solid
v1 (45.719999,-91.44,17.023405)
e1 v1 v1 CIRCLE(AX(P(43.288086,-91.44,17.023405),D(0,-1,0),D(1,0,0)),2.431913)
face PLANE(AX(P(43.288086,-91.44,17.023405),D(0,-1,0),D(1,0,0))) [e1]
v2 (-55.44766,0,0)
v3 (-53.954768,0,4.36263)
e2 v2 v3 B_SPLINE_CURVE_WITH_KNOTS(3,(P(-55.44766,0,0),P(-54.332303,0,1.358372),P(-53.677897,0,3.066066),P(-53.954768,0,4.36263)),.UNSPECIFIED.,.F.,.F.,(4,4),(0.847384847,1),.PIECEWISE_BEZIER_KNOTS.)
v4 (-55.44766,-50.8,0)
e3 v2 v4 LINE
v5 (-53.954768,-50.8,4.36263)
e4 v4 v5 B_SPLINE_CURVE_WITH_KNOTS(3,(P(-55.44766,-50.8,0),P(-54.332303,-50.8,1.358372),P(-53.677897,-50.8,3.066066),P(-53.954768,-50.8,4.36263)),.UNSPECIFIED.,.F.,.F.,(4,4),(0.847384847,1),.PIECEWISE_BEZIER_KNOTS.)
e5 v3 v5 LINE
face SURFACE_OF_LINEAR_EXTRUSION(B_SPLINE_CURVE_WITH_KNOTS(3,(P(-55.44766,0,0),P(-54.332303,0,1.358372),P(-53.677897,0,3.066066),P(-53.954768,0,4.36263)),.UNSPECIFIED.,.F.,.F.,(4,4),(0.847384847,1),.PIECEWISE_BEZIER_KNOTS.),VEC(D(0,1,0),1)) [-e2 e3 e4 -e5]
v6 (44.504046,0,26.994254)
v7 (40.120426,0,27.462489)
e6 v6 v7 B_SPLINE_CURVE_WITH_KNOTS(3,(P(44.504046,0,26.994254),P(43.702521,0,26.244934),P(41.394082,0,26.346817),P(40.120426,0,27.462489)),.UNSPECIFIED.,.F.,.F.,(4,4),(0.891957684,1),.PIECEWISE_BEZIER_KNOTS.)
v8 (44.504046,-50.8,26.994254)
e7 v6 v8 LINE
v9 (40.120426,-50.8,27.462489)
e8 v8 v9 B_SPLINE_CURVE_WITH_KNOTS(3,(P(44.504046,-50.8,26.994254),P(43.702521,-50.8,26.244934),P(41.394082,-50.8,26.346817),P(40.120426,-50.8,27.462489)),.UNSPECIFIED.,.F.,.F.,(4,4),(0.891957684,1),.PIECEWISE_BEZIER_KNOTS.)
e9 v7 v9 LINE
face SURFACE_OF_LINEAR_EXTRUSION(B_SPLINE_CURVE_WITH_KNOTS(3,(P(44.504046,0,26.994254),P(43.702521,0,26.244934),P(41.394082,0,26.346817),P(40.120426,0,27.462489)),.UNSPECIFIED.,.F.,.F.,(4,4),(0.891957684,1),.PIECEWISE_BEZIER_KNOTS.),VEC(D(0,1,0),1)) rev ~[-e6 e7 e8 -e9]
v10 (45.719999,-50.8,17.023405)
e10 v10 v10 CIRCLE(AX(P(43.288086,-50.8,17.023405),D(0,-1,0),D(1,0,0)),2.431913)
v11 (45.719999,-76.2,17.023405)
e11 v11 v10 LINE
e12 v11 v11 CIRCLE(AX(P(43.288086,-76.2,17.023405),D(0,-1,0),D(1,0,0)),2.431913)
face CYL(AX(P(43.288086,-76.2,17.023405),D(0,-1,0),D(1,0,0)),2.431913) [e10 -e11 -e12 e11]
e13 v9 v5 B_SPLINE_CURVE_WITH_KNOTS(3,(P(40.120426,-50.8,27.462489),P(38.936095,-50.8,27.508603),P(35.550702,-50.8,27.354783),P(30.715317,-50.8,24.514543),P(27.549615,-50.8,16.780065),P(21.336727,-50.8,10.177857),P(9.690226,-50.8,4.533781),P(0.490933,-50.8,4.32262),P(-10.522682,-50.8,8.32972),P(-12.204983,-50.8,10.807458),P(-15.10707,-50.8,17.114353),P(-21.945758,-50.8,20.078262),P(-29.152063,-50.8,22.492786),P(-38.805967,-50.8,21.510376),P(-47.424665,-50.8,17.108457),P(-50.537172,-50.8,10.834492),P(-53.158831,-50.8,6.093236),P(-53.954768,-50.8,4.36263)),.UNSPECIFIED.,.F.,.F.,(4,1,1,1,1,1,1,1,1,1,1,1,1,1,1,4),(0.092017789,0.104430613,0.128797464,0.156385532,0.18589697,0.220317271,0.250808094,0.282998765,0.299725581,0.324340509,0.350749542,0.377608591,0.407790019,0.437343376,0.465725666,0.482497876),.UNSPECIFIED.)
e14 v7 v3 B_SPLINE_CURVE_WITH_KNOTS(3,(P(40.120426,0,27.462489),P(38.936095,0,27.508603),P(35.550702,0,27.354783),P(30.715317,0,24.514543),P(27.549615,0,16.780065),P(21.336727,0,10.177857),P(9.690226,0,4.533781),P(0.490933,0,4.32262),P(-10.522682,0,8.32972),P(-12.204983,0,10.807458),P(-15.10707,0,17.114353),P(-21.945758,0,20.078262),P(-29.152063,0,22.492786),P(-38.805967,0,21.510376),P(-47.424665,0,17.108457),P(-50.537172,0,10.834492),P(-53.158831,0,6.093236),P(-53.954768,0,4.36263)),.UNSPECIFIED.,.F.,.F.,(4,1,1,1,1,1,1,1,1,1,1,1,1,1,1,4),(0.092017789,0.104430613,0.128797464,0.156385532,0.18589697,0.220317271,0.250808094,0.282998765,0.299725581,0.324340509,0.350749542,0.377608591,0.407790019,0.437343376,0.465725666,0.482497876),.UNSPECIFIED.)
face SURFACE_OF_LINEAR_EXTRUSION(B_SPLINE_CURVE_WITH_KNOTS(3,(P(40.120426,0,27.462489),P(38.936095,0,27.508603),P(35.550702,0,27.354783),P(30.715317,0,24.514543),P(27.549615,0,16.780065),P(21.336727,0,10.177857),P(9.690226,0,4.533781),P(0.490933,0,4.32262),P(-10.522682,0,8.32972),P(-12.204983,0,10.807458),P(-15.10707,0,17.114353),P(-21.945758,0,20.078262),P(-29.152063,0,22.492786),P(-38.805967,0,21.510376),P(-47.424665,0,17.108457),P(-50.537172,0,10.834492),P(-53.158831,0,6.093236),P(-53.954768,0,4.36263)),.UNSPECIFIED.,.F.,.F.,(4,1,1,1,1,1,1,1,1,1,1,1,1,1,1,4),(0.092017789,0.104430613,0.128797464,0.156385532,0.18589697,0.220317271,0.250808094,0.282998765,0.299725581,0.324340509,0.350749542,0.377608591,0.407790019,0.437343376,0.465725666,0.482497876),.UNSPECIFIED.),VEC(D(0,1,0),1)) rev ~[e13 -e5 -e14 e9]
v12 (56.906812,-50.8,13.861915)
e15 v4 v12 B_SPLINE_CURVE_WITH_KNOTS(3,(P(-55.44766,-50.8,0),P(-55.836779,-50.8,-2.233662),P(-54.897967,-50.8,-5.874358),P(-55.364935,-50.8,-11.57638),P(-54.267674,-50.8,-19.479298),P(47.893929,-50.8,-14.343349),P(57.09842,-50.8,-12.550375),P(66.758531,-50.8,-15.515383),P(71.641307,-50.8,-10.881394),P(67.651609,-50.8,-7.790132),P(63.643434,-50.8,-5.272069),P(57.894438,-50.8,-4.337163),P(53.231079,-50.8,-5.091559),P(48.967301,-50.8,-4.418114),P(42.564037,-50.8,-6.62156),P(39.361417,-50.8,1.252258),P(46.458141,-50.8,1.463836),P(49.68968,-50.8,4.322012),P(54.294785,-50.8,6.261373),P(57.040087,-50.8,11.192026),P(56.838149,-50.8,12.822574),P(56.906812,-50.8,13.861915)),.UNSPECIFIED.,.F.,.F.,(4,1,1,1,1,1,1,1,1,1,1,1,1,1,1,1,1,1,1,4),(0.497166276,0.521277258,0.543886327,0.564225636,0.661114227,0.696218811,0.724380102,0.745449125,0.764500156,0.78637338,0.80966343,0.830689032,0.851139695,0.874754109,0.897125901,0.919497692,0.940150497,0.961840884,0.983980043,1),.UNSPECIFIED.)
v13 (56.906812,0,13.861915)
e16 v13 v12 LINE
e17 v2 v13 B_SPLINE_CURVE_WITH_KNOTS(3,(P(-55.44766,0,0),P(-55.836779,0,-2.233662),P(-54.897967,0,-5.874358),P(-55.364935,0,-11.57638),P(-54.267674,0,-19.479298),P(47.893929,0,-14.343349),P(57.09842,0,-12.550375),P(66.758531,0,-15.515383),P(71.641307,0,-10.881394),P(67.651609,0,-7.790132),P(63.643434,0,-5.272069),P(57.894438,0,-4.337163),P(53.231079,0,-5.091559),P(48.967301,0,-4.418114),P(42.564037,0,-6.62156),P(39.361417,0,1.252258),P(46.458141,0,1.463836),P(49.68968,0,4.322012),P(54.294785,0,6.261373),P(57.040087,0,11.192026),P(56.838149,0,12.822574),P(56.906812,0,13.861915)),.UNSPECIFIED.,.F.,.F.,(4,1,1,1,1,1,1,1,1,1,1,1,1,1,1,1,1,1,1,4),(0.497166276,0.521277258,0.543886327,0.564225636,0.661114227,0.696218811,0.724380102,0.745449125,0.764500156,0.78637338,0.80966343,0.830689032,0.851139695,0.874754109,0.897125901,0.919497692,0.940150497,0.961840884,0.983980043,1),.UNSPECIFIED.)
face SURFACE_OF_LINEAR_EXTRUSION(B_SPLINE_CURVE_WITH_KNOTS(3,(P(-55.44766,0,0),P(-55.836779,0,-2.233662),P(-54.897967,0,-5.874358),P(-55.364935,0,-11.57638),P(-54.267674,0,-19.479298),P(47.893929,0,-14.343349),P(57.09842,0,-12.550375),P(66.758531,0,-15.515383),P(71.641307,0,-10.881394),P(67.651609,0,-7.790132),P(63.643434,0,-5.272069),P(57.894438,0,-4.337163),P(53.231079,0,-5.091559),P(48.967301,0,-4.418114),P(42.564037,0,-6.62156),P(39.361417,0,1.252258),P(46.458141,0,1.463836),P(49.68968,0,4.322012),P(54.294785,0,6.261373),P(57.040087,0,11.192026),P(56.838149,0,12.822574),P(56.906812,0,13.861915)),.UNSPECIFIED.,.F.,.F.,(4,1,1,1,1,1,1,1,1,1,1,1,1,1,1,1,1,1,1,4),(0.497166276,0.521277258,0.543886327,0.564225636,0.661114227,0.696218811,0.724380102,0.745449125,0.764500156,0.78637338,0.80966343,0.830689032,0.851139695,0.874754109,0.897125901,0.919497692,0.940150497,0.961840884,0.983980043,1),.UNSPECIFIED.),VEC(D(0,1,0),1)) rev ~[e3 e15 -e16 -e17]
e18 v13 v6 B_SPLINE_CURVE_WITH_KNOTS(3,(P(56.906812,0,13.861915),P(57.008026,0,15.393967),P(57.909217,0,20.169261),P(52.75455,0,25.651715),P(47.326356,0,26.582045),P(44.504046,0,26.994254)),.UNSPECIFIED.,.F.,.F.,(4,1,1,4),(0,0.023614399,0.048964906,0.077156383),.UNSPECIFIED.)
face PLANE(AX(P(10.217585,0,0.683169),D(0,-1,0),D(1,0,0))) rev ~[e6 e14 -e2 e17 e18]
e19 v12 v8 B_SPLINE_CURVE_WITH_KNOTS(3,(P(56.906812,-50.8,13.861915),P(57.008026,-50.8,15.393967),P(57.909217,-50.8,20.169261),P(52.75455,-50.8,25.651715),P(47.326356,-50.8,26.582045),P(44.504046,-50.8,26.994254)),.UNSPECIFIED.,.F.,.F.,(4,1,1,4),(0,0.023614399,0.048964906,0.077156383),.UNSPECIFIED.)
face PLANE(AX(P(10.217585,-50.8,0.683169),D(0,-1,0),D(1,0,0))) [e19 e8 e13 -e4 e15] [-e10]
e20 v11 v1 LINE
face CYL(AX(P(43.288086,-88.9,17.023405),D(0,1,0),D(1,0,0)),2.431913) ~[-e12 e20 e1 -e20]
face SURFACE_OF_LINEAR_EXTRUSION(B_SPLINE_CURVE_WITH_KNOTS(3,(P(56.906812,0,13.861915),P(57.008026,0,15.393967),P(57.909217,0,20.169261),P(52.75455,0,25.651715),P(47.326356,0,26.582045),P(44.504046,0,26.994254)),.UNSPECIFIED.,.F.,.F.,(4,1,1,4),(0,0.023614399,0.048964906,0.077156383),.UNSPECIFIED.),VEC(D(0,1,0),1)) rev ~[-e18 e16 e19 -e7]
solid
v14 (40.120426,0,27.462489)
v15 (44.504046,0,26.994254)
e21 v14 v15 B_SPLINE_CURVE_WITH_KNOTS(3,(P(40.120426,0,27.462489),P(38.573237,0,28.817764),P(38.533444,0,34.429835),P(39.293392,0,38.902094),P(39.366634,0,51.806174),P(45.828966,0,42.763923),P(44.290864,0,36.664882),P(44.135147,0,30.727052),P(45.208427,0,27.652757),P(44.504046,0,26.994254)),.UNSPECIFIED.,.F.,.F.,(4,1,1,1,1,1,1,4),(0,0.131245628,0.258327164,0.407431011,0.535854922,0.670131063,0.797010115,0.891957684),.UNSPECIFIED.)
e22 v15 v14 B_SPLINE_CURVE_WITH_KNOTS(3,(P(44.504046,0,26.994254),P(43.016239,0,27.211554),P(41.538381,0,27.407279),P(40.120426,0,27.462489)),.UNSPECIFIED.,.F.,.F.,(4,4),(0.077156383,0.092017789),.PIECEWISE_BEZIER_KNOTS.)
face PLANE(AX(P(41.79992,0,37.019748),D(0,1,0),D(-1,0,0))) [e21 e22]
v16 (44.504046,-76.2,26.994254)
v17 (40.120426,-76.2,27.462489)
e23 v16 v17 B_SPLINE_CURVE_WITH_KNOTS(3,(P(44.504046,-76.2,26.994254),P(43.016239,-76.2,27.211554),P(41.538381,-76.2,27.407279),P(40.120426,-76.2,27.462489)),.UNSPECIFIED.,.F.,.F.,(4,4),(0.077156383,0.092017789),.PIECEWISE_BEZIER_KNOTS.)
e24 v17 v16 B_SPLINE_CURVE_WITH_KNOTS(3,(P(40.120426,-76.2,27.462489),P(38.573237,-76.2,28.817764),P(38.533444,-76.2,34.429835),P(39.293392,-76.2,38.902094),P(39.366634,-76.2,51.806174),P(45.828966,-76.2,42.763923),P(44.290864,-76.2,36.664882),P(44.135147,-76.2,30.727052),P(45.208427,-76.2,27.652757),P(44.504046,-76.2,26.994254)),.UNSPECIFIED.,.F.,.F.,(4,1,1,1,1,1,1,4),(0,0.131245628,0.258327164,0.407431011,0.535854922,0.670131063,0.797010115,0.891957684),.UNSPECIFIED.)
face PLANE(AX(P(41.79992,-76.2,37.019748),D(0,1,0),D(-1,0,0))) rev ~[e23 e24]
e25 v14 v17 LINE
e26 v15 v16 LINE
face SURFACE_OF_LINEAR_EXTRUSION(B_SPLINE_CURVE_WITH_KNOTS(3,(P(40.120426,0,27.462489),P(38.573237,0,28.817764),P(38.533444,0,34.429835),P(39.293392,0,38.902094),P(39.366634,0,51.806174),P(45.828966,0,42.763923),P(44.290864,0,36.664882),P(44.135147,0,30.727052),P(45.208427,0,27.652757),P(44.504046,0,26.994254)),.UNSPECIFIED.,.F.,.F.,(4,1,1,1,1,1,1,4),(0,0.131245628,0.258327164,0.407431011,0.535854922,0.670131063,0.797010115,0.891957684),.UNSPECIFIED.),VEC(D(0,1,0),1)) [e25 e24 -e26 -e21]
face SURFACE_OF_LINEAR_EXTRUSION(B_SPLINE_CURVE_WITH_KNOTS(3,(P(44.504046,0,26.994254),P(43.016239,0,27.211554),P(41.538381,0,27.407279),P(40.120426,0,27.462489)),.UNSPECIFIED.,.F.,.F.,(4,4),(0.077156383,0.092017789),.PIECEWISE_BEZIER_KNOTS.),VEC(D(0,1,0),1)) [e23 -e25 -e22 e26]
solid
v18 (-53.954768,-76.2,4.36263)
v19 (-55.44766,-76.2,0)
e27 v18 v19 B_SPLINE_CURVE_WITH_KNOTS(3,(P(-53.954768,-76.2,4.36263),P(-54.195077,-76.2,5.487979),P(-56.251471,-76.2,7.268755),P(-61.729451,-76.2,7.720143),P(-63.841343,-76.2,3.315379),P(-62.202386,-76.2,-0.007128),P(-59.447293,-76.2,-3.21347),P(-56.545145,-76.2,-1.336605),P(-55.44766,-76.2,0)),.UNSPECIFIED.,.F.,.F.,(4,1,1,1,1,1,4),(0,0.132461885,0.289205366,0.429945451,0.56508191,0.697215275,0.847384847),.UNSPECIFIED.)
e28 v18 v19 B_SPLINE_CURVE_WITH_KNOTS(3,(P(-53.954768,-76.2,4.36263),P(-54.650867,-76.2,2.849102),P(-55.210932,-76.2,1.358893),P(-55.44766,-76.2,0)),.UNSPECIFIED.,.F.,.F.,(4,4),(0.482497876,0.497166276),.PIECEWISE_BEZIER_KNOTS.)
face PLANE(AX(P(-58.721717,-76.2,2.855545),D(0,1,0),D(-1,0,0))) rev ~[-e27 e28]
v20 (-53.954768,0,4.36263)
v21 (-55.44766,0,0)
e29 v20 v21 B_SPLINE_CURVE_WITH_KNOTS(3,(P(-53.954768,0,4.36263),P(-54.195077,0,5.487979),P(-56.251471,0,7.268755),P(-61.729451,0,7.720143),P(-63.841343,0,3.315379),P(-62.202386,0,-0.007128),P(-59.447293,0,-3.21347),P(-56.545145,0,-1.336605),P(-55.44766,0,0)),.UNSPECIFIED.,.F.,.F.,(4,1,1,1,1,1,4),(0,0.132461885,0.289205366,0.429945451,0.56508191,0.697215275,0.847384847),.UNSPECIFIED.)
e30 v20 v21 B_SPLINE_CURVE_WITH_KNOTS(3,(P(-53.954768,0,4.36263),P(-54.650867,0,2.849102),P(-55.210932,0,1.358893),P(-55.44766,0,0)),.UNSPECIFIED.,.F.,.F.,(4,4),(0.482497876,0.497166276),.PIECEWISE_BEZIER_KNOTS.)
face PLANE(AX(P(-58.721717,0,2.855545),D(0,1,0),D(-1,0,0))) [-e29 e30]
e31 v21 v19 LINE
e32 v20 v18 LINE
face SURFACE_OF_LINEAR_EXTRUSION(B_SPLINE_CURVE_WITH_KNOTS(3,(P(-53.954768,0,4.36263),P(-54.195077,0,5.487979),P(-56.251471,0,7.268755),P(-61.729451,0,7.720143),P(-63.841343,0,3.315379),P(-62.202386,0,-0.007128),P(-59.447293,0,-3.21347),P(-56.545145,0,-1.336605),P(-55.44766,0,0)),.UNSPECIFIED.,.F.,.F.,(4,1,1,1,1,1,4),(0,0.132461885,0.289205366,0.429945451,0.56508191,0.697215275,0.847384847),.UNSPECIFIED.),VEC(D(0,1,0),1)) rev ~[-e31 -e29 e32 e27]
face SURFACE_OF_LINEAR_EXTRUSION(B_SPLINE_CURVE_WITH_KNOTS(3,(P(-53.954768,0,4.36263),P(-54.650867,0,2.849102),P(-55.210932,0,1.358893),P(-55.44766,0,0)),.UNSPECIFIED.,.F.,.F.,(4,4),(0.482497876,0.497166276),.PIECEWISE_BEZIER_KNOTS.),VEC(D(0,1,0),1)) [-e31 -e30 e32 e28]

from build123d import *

# Parameters (mm, degrees)
F1_DEPTH = 76.2
F2_R     = 2.4319130927
F3_DEPTH = 12.7
F4_DEPTH = 2.54
F5_DEPTH = 25.4


with BuildPart() as f1:
    # F0 (on Front) → F1 (new body)
    with BuildSketch(Plane.XZ):
        with BuildLine():
            add(Edge.make_bspline(
                [(44.5040464401, 26.9942544401), (43.7025207143, 26.2449339369), (41.3940822523, 26.3468172293), (40.1204258352, 27.4624891095)],
                knots=[0.8919576844, 0.8919576844, 0.8919576844, 0.8919576844, 1, 1, 1, 1], degree=3))
            add(Edge.make_bspline(
                [(40.1204258352, 27.4624891095), (38.9360947969, 27.5086026747), (35.5507022413, 27.3547831172), (30.715316621, 24.5145429625), (27.549615074, 16.7800645689), (21.3367269152, 10.1778572579), (9.690225897, 4.5337814089), (0.4909328579, 4.3226200092), (-10.5226815139, 8.3297199529), (-12.2049833552, 10.8074582653), (-15.1070696494, 17.1143533318), (-21.9457581229, 20.0782616448), (-29.1520626347, 22.4927855247), (-38.8059668984, 21.5103761789), (-47.4246645535, 17.1084565784), (-50.5371723174, 10.8344917909), (-53.1588308159, 6.0932356033), (-53.9547677358, 4.3626299569)],
                knots=[0.0920177892, 0.0920177892, 0.0920177892, 0.0920177892, 0.1044306128, 0.1287974644, 0.1563855317, 0.1858969699, 0.220317271, 0.2508080941, 0.2829987651, 0.2997255812, 0.3243405086, 0.3507495419, 0.3776085905, 0.4077900186, 0.4373433756, 0.4657256658, 0.4824978765, 0.4824978765, 0.4824978765, 0.4824978765], degree=3))
            add(Edge.make_bspline(
                [(-55.4476603866, 0), (-54.3323025136, 1.35837208), (-53.6778969091, 3.0660661447), (-53.9547677358, 4.3626299569)],
                knots=[0.8473848473, 0.8473848473, 0.8473848473, 0.8473848473, 1, 1, 1, 1], degree=3))
            add(Edge.make_bspline(
                [(-55.4476603866, 0), (-55.8367791323, -2.2336624741), (-54.8979671013, -5.8743579042), (-55.3649348107, -11.5763798366), (-54.2676743855, -19.4792978799), (47.893929392, -14.3433493463), (57.0984201671, -12.5503749206), (66.7585309989, -15.5153831326), (71.6413073611, -10.8813936834), (67.651608515, -7.7901322668), (63.6434344788, -5.2720688424), (57.894437502, -4.3371630294), (53.2310787605, -5.091559031), (48.9673008094, -4.4181140537), (42.5640373489, -6.6215596861), (39.3614174037, 1.2522575321), (46.4581410781, 1.4638363333), (49.6896797698, 4.3220120909), (54.2947853073, 6.2613734221), (57.0400872236, 11.1920257082), (56.8381486744, 12.8225743471), (56.906811893, 13.8619150966)],
                knots=[0.497166276, 0.497166276, 0.497166276, 0.497166276, 0.5212772581, 0.5438863274, 0.5642256362, 0.6611142266, 0.6962188111, 0.7243801021, 0.7454491245, 0.764500156, 0.7863733796, 0.8096634303, 0.8306890319, 0.851139695, 0.8747541093, 0.897125901, 0.9194976922, 0.9401504965, 0.9618408842, 0.9839800429, 1, 1, 1, 1], degree=3))
            add(Edge.make_bspline(
                [(56.906811893, 13.8619150966), (57.0080256879, 15.3939670994), (57.9092168831, 20.1692609502), (52.7545495628, 25.6517146313), (47.3263555943, 26.5820452218), (44.5040464401, 26.9942544401)],
                knots=[0, 0, 0, 0, 0.0236143992, 0.0489649056, 0.0771563834, 0.0771563834, 0.0771563834, 0.0771563834], degree=3))
        make_face()
    extrude(amount=F1_DEPTH)

    # F2 (on face) → F3 (join)
    with BuildSketch(Plane.XZ.offset(76.2)):
        with Locations((43.2880856097, 17.0234050602)):
            Circle(F2_R)
    extrude(amount=F3_DEPTH)

    # F4 (add): a face of the model
    f4_faces = [f1.faces().sort_by_distance(p)[0] for p in [
        (43.2880856097, -88.9, 17.0234050602),
    ]]
    extrude(f4_faces, amount=F4_DEPTH)

    # F5 (cut): a face of the model
    f5_faces = [f1.faces().sort_by_distance(p)[0] for p in [
        (2.0508288129, -76.2, 0.9168755014),
    ]]
    extrude(f5_faces, amount=-F5_DEPTH, mode=Mode.SUBTRACT)


with BuildPart() as f1b:
    # F0 (on Front) → F1, piece 2 (new body)
    with BuildSketch(Plane.XZ):
        with BuildLine():
            add(Edge.make_bspline(
                [(40.1204258352, 27.4624891095), (38.573237263, 28.8177641745), (38.5334436907, 34.4298351403), (39.2933915498, 38.9020936), (39.3666336438, 51.8061735204), (45.8289660834, 42.7639227626), (44.2908641443, 36.6648823613), (44.1351473438, 30.7270519338), (45.2084271192, 27.6527571778), (44.5040464401, 26.9942544401)],
                knots=[0, 0, 0, 0, 0.1312456278, 0.2583271636, 0.407431011, 0.5358549223, 0.670131063, 0.7970101148, 0.8919576844, 0.8919576844, 0.8919576844, 0.8919576844], degree=3))
            add(Edge.make_bspline(
                [(44.5040464401, 26.9942544401), (43.0162393027, 27.2115544535), (41.5383807527, 27.4072790758), (40.1204258352, 27.4624891095)],
                knots=[0.0771563834, 0.0771563834, 0.0771563834, 0.0771563834, 0.0920177892, 0.0920177892, 0.0920177892, 0.0920177892], degree=3))
        make_face()
    extrude(amount=F1_DEPTH)


with BuildPart() as f1c:
    # F0 (on Front) → F1, piece 3 (new body)
    with BuildSketch(Plane.XZ):
        with BuildLine():
            add(Edge.make_bspline(
                [(-53.9547677358, 4.3626299569), (-54.6508668327, 2.8491016892), (-55.2109321947, 1.3588933568), (-55.4476603866, 0)],
                knots=[0.4824978765, 0.4824978765, 0.4824978765, 0.4824978765, 0.497166276, 0.497166276, 0.497166276, 0.497166276], degree=3))
            add(Edge.make_bspline(
                [(-53.9547677358, 4.3626299569), (-54.1950769782, 5.487978811), (-56.2514707817, 7.2687545626), (-61.7294511282, 7.7201431922), (-63.841342532, 3.3153788735), (-62.2023861696, -0.0071278235), (-59.4472931082, -3.2134699608), (-56.5451452134, -1.3366048541), (-55.4476603866, 0)],
                knots=[0, 0, 0, 0, 0.1324618855, 0.2892053657, 0.429945451, 0.5650819103, 0.6972152752, 0.8473848473, 0.8473848473, 0.8473848473, 0.8473848473], degree=3))
        make_face()
    extrude(amount=F1_DEPTH)


solid = Compound([f1.part, f1b.part, f1c.part])
